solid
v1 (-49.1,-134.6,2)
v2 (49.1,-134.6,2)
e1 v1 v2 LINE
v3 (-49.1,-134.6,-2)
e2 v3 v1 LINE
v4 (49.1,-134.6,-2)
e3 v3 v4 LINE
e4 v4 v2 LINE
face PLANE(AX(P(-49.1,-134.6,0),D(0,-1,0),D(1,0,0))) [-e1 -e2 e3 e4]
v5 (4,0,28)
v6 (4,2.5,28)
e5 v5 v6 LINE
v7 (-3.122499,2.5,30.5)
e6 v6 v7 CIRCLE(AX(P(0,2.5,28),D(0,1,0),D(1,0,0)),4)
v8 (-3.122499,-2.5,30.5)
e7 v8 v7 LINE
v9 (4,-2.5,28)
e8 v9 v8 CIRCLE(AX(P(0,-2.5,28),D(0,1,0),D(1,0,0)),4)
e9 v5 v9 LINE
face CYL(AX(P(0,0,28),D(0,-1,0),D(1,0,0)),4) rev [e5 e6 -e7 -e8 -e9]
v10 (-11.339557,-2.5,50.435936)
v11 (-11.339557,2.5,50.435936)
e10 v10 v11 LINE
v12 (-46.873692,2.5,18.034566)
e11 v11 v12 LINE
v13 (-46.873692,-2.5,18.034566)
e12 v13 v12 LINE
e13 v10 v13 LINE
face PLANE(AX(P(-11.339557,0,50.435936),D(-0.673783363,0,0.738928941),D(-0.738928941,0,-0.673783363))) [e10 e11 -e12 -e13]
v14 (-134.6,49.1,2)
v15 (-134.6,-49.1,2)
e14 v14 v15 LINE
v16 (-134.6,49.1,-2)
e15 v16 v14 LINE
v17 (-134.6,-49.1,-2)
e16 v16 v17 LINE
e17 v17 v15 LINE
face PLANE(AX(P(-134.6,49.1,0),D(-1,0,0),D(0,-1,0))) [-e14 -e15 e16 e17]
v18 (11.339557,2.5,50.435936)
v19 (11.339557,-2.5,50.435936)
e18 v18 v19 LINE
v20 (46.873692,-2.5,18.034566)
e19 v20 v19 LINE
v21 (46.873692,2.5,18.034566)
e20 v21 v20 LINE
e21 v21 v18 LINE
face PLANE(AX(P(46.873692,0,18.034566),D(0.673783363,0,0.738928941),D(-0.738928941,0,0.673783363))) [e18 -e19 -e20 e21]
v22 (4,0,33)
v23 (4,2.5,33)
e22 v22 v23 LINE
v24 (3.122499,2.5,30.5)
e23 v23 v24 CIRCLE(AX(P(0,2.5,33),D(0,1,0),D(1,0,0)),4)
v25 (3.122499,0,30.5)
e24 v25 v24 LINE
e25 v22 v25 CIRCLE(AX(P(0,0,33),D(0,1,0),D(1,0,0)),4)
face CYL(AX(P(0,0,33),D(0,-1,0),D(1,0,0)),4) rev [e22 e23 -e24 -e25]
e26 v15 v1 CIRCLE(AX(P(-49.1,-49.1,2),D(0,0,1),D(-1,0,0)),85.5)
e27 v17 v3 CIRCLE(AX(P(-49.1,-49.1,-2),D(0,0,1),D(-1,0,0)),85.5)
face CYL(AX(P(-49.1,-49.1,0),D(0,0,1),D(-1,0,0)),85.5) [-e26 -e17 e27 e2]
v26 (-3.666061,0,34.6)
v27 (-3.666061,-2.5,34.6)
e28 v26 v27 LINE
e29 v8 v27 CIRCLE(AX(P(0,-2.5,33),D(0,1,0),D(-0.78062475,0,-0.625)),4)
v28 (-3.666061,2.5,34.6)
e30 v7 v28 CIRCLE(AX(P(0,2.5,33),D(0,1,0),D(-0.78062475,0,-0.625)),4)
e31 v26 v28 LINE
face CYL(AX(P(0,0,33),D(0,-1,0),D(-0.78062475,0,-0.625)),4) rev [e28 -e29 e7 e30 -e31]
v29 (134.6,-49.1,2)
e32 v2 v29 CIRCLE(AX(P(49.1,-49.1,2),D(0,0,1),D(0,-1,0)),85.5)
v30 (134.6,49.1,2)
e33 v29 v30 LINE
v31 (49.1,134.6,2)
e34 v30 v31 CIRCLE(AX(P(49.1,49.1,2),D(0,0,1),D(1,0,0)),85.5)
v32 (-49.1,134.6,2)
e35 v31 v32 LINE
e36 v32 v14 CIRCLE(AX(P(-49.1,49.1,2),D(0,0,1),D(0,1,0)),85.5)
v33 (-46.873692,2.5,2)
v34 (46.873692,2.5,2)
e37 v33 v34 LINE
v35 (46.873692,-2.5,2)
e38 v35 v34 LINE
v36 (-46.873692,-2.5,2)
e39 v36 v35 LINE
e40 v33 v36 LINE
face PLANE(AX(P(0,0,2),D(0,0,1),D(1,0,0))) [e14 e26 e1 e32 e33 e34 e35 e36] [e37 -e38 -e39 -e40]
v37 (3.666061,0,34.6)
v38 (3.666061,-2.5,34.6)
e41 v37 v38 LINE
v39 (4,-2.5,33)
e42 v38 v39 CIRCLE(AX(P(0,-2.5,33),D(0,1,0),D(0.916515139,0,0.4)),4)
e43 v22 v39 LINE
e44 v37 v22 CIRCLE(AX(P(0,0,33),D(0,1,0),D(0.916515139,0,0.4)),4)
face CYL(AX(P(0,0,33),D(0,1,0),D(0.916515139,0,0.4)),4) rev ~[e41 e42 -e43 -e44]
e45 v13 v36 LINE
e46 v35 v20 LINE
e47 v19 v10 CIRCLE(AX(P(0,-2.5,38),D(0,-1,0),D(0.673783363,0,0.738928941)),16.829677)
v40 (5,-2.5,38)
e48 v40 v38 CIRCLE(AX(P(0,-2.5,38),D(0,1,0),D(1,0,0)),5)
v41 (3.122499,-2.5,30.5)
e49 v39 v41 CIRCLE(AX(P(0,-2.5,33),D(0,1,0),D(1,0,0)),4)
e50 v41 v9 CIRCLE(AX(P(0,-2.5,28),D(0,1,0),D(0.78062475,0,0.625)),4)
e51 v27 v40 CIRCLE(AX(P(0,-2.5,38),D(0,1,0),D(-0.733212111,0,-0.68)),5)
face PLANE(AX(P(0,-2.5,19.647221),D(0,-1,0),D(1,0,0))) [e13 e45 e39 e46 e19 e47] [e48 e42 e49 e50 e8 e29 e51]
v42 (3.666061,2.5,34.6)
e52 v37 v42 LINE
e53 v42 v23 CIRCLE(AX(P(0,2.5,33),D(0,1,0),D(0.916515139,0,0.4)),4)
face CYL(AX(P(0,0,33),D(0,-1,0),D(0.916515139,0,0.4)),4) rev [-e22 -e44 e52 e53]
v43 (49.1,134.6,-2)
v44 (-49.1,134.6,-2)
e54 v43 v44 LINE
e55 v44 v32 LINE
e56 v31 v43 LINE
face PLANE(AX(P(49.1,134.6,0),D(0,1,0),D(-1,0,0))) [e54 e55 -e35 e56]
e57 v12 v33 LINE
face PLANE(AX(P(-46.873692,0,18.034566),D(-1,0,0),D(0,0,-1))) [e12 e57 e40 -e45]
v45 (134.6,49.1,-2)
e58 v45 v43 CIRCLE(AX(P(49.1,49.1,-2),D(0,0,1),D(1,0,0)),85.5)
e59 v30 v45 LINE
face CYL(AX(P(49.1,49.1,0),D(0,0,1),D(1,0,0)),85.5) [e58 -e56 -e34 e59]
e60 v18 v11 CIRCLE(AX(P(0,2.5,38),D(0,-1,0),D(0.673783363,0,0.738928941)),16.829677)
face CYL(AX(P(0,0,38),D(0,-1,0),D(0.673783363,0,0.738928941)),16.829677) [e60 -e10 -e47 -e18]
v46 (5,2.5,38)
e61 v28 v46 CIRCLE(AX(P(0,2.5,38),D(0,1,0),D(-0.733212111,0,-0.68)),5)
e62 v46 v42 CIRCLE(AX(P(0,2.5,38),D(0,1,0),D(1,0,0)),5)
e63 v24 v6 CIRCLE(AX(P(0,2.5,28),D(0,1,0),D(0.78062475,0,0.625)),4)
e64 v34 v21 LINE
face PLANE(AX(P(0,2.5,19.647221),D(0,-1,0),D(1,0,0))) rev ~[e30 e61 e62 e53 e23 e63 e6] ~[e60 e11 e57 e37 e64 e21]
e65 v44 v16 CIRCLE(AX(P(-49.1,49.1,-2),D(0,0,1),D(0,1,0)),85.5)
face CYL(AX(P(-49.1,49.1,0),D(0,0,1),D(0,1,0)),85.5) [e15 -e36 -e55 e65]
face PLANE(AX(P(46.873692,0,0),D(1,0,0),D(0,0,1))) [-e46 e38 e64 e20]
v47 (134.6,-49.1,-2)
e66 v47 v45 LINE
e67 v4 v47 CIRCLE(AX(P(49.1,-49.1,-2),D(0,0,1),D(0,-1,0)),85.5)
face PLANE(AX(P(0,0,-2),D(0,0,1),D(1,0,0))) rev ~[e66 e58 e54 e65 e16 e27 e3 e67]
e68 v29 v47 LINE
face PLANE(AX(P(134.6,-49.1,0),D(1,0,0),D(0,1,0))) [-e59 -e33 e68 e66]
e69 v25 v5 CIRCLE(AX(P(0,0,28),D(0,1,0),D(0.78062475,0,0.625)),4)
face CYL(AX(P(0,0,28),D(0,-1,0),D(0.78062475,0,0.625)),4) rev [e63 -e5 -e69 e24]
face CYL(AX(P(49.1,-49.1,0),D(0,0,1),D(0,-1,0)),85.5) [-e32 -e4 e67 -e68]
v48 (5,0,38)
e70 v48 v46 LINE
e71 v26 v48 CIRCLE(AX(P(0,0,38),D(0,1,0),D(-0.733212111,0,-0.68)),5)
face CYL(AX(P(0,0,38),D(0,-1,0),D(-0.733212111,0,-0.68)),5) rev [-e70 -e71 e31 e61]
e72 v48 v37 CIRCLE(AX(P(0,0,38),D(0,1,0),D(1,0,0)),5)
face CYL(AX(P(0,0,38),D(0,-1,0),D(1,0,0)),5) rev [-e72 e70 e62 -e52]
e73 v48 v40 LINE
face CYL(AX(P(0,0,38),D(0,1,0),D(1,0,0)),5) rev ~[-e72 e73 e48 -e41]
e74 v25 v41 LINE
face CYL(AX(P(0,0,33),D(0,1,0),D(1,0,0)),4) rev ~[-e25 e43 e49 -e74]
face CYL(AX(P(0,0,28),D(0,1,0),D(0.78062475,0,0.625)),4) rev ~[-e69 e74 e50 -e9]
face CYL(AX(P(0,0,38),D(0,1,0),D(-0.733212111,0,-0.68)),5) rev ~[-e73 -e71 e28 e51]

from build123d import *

# Parameters (mm, degrees)
F1_DEPTH = 2
F3_DEPTH = 2.5


with BuildPart() as f1:
    # F0 (on Top) → F1 (new body, symmetric)
    with BuildSketch(Plane.XY):
        with BuildLine():
            Line((49.1, 134.6), (-49.1, 134.6))
            ThreePointArc((-49.1, 134.6), (-109.5576297914, 109.5576297914), (-134.6, 49.1))
            Line((-134.6, 49.1), (-134.6, -49.1))
            ThreePointArc((-134.6, -49.1), (-109.5576297914, -109.5576297914), (-49.1, -134.6))
            Line((-49.1, -134.6), (49.1, -134.6))
            ThreePointArc((49.1, -134.6), (109.5576297914, -109.5576297914), (134.6, -49.1))
            Line((134.6, -49.1), (134.6, 49.1))
            ThreePointArc((134.6, 49.1), (109.5576297914, 109.5576297914), (49.1, 134.6))
        make_face()
    extrude(amount=F1_DEPTH, both=True)

    # F2 (on Front) → F3 (join, symmetric)
    with BuildSketch(Plane.XZ):
        with BuildLine():
            Line((-46.8736924231, 0), (0, 0))
            Line((0, 0), (46.8736924231, 0))
            Line((46.8736924231, 0), (46.8736924231, 18.0345661938))
            Line((46.8736924231, 18.0345661938), (11.3395565202, 50.4359355817))
            ThreePointArc((11.3395565202, 50.4359355817), (0, 54.829677236), (-11.3395565202, 50.4359355817))
            Line((-11.3395565202, 50.4359355817), (-46.8736924231, 18.0345661938))
            Line((-46.8736924231, 18.0345661938), (-46.8736924231, 0))
        make_face()
        with BuildLine():
            ThreePointArc((-3.666060556, 34.6), (-1.8261567868, 42.6545839116), (5, 38))
            ThreePointArc((5, 38), (4.6545839116, 36.1738432132), (3.666060556, 34.6))
            ThreePointArc((3.666060556, 34.6), (3.9156252517, 33.8172385748), (4, 33))
            ThreePointArc((4, 33), (3.7742546282, 31.6752351146), (3.1224989992, 30.5))
            ThreePointArc((3.1224989992, 30.5), (3.7742546282, 29.3247648854), (4, 28))
            ThreePointArc((4, 28), (-1.3247648854, 24.2257453718), (-3.1224989992, 30.5))
            ThreePointArc((-3.1224989992, 30.5), (-3.9653039239, 32.4742959088), (-3.666060556, 34.6))
        make_face(mode=Mode.SUBTRACT)
    extrude(amount=F3_DEPTH, both=True)


solid = f1.part
